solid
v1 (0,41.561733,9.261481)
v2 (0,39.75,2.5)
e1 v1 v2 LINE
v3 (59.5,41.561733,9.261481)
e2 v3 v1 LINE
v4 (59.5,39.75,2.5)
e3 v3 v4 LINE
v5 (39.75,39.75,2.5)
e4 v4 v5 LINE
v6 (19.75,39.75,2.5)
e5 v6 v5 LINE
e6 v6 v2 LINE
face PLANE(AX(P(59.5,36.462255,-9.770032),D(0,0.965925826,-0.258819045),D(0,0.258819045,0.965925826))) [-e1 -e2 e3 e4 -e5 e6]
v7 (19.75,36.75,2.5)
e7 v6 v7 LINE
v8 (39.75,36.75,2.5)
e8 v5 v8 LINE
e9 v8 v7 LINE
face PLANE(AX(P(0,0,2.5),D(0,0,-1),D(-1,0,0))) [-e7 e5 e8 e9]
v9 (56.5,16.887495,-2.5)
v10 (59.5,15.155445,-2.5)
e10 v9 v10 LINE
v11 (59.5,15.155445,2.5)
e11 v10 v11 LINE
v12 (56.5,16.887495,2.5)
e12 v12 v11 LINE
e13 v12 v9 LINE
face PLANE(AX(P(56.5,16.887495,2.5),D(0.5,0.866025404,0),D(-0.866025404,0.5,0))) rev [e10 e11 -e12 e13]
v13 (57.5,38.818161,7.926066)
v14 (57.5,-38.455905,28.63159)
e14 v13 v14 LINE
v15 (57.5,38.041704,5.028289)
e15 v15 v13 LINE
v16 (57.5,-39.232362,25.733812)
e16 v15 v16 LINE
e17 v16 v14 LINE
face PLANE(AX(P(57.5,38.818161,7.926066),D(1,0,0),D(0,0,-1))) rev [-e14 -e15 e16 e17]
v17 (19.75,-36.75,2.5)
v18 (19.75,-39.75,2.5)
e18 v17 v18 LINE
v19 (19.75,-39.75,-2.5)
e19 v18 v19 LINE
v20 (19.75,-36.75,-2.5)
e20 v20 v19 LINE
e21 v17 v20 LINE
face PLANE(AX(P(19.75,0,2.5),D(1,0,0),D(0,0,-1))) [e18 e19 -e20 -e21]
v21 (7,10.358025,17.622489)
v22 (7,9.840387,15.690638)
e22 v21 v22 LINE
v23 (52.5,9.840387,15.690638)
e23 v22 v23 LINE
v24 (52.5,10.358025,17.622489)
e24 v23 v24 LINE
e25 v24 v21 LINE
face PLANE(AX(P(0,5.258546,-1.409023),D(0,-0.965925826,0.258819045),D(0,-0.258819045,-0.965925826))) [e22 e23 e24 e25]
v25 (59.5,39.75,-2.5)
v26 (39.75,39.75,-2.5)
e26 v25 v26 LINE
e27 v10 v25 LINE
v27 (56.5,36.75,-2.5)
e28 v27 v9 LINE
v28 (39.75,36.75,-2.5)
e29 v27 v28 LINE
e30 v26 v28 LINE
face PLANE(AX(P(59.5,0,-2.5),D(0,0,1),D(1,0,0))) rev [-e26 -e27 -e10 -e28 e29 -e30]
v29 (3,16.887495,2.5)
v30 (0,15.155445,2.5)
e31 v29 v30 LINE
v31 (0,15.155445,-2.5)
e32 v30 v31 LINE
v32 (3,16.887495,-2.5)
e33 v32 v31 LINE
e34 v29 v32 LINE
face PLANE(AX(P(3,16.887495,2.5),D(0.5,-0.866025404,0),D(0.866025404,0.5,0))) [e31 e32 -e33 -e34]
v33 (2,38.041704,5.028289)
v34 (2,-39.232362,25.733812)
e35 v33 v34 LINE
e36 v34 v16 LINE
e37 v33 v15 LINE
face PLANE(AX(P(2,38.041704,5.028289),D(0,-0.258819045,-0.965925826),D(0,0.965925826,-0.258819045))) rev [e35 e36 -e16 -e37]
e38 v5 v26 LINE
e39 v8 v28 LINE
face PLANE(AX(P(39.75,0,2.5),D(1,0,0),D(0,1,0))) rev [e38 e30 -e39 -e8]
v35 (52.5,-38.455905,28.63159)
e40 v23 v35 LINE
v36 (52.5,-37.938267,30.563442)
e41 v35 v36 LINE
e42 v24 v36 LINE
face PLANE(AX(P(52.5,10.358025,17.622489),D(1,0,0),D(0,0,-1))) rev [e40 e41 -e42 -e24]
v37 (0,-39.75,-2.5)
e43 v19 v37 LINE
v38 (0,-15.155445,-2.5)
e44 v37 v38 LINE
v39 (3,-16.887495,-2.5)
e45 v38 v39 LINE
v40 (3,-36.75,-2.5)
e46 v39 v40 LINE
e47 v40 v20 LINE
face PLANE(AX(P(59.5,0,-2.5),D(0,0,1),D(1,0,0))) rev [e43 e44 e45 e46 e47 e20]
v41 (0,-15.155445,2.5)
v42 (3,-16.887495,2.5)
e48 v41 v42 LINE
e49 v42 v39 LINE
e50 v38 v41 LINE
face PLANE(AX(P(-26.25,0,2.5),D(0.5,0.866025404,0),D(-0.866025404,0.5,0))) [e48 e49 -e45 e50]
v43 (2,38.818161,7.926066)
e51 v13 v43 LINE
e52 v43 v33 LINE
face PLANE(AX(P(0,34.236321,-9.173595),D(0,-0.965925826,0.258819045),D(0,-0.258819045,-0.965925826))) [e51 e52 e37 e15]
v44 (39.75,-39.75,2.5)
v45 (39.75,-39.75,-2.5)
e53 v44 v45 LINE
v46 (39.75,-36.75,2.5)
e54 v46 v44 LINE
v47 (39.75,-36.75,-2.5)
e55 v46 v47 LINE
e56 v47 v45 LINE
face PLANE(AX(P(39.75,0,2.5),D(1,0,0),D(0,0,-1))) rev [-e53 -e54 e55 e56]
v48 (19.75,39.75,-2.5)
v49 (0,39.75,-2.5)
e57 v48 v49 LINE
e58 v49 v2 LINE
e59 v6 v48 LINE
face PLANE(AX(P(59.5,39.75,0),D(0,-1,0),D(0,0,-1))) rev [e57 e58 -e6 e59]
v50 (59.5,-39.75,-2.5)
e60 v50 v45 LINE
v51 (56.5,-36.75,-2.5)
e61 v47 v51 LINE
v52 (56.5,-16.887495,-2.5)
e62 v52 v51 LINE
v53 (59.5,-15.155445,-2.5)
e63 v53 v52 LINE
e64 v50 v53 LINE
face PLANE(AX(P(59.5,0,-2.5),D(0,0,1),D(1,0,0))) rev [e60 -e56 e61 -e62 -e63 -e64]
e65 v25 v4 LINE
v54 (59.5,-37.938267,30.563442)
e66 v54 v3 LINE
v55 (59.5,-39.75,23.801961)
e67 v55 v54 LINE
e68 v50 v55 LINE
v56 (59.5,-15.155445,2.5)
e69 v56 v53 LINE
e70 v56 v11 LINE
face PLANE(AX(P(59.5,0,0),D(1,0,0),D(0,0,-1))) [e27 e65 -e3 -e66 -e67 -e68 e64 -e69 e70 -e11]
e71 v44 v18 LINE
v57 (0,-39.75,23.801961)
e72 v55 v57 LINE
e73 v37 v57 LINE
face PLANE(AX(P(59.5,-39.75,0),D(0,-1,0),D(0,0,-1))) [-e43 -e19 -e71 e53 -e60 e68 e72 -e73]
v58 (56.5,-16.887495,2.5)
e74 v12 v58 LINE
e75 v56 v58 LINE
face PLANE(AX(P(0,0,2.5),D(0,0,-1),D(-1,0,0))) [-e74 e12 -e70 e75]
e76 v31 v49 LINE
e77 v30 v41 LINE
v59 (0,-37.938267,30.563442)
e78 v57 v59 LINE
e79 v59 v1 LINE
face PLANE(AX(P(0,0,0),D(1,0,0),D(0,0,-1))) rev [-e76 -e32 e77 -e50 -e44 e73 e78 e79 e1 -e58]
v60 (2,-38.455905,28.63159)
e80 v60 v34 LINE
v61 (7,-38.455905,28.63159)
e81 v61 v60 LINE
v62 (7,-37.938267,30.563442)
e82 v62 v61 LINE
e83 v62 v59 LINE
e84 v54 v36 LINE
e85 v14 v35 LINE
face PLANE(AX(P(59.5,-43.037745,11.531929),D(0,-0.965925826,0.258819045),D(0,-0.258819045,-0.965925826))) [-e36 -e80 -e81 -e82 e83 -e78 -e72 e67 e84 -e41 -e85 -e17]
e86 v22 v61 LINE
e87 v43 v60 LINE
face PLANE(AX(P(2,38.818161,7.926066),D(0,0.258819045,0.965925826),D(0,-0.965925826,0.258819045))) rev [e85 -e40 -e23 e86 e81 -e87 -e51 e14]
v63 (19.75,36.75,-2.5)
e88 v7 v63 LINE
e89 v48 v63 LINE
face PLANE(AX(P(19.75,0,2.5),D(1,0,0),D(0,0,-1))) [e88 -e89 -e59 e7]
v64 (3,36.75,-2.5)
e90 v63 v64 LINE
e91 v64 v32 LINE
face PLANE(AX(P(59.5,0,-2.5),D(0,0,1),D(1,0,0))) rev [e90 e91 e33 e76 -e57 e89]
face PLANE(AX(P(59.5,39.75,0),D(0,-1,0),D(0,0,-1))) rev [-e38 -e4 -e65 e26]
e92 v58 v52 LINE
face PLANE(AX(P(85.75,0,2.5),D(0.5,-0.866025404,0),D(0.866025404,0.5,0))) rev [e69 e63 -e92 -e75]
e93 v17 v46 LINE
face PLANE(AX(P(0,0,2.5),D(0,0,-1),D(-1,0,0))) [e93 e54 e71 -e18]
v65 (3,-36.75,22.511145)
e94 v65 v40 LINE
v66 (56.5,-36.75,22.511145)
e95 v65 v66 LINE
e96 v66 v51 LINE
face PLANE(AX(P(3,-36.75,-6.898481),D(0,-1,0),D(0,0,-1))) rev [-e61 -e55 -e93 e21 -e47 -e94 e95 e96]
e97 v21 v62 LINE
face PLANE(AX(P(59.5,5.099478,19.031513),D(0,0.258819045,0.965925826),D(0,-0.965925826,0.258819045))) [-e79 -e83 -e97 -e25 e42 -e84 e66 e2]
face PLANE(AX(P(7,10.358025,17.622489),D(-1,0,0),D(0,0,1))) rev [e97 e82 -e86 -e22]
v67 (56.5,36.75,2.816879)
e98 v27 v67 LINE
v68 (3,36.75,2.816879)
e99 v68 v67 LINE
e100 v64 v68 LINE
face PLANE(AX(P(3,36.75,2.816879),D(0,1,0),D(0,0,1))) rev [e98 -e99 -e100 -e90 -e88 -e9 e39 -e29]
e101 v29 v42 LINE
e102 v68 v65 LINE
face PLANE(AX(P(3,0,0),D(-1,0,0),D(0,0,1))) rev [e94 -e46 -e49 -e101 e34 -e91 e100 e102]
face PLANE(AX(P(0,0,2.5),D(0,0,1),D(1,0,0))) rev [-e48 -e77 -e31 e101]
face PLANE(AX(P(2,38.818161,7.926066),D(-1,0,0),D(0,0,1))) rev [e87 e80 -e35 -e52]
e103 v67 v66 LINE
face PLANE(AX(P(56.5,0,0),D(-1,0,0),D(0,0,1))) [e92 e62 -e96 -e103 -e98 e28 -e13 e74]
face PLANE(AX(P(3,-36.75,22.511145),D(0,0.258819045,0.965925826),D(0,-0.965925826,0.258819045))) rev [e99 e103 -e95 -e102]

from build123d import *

# Parameters (mm, degrees)
BOSS_EXTRUDE1_DEPTH = 59.5
SKETCH4_W           = 55.5
SKETCH4_H           = 3
CUT_EXTRUDE1_DEPTH  = 80
SKETCH5_W           = 45.5
SKETCH5_H           = 2
CUT_EXTRUDE2_DEPTH  = 50
CUT_EXTRUDE3_START  = -3
CUT_EXTRUDE3_DEPTH  = 53.5
SKETCH7_W           = 20
SKETCH7_H           = 3
CUT_EXTRUDE4_DEPTH  = 5


with BuildPart() as part:
    # Sketch3 → Boss-Extrude1 (new body)
    with BuildSketch(Plane.YZ):
        Polygon((39.75, -2.5), (39.75, 2.5), (41.561733316, 9.261480784), (-37.938266684, 30.563441582), (-39.75, 23.801960798), (-39.75, -2.5), align=None)
    extrude(amount=BOSS_EXTRUDE1_DEPTH)

    # Sketch4 → Cut-Extrude1 (cut)
    with BuildSketch(Plane(origin=(0, -43.0377451, 11.531929044), x_dir=(1, 0, 0), z_dir=(0, -0.9659258262890679, 0.25881904510252235))):
        with Locations((29.75, 16.202871609)):
            Rectangle(SKETCH4_W, SKETCH4_H)
    extrude(amount=-CUT_EXTRUDE1_DEPTH, mode=Mode.SUBTRACT)

    # Sketch5 → Cut-Extrude2 (cut)
    with BuildSketch(Plane(origin=(0, -43.0377451, 11.531929044), x_dir=(1, 0, 0), z_dir=(0, -0.9659258262890679, 0.25881904510252235))):
        with Locations((29.75, 18.702871609)):
            Rectangle(SKETCH5_W, SKETCH5_H)
    extrude(amount=-CUT_EXTRUDE2_DEPTH, mode=Mode.SUBTRACT)

    # Sketch6 → Cut-Extrude3 (cut)
    with BuildSketch(Plane.YZ.offset(59.5).offset(CUT_EXTRUDE3_START)):
        Polygon((-36.75, -6.898480781), (-36.75, 22.511144618), (36.75, 2.816878974), (36.75, -6.898480781), align=None)
    extrude(amount=-CUT_EXTRUDE3_DEPTH, mode=Mode.SUBTRACT)

    # Sketch7 → Cut-Extrude4 (cut)
    with BuildSketch(Plane(origin=(0, 0, -2.5), x_dir=(1, 0, 0), z_dir=(0, 0, -1))):
        with Locations((29.75, 38.25)):
            Rectangle(SKETCH7_W, SKETCH7_H)
        Polygon((3, -16.887495374), (3, 16.887495374), (-26.25, 0), align=None)
        Polygon((56.5, -16.887495374), (85.75, 0), (56.5, 16.887495374), align=None)
        with Locations((29.75, -38.25)):
            Rectangle(SKETCH7_W, SKETCH7_H)
    extrude(amount=-CUT_EXTRUDE4_DEPTH, mode=Mode.SUBTRACT)


solid = part.part
